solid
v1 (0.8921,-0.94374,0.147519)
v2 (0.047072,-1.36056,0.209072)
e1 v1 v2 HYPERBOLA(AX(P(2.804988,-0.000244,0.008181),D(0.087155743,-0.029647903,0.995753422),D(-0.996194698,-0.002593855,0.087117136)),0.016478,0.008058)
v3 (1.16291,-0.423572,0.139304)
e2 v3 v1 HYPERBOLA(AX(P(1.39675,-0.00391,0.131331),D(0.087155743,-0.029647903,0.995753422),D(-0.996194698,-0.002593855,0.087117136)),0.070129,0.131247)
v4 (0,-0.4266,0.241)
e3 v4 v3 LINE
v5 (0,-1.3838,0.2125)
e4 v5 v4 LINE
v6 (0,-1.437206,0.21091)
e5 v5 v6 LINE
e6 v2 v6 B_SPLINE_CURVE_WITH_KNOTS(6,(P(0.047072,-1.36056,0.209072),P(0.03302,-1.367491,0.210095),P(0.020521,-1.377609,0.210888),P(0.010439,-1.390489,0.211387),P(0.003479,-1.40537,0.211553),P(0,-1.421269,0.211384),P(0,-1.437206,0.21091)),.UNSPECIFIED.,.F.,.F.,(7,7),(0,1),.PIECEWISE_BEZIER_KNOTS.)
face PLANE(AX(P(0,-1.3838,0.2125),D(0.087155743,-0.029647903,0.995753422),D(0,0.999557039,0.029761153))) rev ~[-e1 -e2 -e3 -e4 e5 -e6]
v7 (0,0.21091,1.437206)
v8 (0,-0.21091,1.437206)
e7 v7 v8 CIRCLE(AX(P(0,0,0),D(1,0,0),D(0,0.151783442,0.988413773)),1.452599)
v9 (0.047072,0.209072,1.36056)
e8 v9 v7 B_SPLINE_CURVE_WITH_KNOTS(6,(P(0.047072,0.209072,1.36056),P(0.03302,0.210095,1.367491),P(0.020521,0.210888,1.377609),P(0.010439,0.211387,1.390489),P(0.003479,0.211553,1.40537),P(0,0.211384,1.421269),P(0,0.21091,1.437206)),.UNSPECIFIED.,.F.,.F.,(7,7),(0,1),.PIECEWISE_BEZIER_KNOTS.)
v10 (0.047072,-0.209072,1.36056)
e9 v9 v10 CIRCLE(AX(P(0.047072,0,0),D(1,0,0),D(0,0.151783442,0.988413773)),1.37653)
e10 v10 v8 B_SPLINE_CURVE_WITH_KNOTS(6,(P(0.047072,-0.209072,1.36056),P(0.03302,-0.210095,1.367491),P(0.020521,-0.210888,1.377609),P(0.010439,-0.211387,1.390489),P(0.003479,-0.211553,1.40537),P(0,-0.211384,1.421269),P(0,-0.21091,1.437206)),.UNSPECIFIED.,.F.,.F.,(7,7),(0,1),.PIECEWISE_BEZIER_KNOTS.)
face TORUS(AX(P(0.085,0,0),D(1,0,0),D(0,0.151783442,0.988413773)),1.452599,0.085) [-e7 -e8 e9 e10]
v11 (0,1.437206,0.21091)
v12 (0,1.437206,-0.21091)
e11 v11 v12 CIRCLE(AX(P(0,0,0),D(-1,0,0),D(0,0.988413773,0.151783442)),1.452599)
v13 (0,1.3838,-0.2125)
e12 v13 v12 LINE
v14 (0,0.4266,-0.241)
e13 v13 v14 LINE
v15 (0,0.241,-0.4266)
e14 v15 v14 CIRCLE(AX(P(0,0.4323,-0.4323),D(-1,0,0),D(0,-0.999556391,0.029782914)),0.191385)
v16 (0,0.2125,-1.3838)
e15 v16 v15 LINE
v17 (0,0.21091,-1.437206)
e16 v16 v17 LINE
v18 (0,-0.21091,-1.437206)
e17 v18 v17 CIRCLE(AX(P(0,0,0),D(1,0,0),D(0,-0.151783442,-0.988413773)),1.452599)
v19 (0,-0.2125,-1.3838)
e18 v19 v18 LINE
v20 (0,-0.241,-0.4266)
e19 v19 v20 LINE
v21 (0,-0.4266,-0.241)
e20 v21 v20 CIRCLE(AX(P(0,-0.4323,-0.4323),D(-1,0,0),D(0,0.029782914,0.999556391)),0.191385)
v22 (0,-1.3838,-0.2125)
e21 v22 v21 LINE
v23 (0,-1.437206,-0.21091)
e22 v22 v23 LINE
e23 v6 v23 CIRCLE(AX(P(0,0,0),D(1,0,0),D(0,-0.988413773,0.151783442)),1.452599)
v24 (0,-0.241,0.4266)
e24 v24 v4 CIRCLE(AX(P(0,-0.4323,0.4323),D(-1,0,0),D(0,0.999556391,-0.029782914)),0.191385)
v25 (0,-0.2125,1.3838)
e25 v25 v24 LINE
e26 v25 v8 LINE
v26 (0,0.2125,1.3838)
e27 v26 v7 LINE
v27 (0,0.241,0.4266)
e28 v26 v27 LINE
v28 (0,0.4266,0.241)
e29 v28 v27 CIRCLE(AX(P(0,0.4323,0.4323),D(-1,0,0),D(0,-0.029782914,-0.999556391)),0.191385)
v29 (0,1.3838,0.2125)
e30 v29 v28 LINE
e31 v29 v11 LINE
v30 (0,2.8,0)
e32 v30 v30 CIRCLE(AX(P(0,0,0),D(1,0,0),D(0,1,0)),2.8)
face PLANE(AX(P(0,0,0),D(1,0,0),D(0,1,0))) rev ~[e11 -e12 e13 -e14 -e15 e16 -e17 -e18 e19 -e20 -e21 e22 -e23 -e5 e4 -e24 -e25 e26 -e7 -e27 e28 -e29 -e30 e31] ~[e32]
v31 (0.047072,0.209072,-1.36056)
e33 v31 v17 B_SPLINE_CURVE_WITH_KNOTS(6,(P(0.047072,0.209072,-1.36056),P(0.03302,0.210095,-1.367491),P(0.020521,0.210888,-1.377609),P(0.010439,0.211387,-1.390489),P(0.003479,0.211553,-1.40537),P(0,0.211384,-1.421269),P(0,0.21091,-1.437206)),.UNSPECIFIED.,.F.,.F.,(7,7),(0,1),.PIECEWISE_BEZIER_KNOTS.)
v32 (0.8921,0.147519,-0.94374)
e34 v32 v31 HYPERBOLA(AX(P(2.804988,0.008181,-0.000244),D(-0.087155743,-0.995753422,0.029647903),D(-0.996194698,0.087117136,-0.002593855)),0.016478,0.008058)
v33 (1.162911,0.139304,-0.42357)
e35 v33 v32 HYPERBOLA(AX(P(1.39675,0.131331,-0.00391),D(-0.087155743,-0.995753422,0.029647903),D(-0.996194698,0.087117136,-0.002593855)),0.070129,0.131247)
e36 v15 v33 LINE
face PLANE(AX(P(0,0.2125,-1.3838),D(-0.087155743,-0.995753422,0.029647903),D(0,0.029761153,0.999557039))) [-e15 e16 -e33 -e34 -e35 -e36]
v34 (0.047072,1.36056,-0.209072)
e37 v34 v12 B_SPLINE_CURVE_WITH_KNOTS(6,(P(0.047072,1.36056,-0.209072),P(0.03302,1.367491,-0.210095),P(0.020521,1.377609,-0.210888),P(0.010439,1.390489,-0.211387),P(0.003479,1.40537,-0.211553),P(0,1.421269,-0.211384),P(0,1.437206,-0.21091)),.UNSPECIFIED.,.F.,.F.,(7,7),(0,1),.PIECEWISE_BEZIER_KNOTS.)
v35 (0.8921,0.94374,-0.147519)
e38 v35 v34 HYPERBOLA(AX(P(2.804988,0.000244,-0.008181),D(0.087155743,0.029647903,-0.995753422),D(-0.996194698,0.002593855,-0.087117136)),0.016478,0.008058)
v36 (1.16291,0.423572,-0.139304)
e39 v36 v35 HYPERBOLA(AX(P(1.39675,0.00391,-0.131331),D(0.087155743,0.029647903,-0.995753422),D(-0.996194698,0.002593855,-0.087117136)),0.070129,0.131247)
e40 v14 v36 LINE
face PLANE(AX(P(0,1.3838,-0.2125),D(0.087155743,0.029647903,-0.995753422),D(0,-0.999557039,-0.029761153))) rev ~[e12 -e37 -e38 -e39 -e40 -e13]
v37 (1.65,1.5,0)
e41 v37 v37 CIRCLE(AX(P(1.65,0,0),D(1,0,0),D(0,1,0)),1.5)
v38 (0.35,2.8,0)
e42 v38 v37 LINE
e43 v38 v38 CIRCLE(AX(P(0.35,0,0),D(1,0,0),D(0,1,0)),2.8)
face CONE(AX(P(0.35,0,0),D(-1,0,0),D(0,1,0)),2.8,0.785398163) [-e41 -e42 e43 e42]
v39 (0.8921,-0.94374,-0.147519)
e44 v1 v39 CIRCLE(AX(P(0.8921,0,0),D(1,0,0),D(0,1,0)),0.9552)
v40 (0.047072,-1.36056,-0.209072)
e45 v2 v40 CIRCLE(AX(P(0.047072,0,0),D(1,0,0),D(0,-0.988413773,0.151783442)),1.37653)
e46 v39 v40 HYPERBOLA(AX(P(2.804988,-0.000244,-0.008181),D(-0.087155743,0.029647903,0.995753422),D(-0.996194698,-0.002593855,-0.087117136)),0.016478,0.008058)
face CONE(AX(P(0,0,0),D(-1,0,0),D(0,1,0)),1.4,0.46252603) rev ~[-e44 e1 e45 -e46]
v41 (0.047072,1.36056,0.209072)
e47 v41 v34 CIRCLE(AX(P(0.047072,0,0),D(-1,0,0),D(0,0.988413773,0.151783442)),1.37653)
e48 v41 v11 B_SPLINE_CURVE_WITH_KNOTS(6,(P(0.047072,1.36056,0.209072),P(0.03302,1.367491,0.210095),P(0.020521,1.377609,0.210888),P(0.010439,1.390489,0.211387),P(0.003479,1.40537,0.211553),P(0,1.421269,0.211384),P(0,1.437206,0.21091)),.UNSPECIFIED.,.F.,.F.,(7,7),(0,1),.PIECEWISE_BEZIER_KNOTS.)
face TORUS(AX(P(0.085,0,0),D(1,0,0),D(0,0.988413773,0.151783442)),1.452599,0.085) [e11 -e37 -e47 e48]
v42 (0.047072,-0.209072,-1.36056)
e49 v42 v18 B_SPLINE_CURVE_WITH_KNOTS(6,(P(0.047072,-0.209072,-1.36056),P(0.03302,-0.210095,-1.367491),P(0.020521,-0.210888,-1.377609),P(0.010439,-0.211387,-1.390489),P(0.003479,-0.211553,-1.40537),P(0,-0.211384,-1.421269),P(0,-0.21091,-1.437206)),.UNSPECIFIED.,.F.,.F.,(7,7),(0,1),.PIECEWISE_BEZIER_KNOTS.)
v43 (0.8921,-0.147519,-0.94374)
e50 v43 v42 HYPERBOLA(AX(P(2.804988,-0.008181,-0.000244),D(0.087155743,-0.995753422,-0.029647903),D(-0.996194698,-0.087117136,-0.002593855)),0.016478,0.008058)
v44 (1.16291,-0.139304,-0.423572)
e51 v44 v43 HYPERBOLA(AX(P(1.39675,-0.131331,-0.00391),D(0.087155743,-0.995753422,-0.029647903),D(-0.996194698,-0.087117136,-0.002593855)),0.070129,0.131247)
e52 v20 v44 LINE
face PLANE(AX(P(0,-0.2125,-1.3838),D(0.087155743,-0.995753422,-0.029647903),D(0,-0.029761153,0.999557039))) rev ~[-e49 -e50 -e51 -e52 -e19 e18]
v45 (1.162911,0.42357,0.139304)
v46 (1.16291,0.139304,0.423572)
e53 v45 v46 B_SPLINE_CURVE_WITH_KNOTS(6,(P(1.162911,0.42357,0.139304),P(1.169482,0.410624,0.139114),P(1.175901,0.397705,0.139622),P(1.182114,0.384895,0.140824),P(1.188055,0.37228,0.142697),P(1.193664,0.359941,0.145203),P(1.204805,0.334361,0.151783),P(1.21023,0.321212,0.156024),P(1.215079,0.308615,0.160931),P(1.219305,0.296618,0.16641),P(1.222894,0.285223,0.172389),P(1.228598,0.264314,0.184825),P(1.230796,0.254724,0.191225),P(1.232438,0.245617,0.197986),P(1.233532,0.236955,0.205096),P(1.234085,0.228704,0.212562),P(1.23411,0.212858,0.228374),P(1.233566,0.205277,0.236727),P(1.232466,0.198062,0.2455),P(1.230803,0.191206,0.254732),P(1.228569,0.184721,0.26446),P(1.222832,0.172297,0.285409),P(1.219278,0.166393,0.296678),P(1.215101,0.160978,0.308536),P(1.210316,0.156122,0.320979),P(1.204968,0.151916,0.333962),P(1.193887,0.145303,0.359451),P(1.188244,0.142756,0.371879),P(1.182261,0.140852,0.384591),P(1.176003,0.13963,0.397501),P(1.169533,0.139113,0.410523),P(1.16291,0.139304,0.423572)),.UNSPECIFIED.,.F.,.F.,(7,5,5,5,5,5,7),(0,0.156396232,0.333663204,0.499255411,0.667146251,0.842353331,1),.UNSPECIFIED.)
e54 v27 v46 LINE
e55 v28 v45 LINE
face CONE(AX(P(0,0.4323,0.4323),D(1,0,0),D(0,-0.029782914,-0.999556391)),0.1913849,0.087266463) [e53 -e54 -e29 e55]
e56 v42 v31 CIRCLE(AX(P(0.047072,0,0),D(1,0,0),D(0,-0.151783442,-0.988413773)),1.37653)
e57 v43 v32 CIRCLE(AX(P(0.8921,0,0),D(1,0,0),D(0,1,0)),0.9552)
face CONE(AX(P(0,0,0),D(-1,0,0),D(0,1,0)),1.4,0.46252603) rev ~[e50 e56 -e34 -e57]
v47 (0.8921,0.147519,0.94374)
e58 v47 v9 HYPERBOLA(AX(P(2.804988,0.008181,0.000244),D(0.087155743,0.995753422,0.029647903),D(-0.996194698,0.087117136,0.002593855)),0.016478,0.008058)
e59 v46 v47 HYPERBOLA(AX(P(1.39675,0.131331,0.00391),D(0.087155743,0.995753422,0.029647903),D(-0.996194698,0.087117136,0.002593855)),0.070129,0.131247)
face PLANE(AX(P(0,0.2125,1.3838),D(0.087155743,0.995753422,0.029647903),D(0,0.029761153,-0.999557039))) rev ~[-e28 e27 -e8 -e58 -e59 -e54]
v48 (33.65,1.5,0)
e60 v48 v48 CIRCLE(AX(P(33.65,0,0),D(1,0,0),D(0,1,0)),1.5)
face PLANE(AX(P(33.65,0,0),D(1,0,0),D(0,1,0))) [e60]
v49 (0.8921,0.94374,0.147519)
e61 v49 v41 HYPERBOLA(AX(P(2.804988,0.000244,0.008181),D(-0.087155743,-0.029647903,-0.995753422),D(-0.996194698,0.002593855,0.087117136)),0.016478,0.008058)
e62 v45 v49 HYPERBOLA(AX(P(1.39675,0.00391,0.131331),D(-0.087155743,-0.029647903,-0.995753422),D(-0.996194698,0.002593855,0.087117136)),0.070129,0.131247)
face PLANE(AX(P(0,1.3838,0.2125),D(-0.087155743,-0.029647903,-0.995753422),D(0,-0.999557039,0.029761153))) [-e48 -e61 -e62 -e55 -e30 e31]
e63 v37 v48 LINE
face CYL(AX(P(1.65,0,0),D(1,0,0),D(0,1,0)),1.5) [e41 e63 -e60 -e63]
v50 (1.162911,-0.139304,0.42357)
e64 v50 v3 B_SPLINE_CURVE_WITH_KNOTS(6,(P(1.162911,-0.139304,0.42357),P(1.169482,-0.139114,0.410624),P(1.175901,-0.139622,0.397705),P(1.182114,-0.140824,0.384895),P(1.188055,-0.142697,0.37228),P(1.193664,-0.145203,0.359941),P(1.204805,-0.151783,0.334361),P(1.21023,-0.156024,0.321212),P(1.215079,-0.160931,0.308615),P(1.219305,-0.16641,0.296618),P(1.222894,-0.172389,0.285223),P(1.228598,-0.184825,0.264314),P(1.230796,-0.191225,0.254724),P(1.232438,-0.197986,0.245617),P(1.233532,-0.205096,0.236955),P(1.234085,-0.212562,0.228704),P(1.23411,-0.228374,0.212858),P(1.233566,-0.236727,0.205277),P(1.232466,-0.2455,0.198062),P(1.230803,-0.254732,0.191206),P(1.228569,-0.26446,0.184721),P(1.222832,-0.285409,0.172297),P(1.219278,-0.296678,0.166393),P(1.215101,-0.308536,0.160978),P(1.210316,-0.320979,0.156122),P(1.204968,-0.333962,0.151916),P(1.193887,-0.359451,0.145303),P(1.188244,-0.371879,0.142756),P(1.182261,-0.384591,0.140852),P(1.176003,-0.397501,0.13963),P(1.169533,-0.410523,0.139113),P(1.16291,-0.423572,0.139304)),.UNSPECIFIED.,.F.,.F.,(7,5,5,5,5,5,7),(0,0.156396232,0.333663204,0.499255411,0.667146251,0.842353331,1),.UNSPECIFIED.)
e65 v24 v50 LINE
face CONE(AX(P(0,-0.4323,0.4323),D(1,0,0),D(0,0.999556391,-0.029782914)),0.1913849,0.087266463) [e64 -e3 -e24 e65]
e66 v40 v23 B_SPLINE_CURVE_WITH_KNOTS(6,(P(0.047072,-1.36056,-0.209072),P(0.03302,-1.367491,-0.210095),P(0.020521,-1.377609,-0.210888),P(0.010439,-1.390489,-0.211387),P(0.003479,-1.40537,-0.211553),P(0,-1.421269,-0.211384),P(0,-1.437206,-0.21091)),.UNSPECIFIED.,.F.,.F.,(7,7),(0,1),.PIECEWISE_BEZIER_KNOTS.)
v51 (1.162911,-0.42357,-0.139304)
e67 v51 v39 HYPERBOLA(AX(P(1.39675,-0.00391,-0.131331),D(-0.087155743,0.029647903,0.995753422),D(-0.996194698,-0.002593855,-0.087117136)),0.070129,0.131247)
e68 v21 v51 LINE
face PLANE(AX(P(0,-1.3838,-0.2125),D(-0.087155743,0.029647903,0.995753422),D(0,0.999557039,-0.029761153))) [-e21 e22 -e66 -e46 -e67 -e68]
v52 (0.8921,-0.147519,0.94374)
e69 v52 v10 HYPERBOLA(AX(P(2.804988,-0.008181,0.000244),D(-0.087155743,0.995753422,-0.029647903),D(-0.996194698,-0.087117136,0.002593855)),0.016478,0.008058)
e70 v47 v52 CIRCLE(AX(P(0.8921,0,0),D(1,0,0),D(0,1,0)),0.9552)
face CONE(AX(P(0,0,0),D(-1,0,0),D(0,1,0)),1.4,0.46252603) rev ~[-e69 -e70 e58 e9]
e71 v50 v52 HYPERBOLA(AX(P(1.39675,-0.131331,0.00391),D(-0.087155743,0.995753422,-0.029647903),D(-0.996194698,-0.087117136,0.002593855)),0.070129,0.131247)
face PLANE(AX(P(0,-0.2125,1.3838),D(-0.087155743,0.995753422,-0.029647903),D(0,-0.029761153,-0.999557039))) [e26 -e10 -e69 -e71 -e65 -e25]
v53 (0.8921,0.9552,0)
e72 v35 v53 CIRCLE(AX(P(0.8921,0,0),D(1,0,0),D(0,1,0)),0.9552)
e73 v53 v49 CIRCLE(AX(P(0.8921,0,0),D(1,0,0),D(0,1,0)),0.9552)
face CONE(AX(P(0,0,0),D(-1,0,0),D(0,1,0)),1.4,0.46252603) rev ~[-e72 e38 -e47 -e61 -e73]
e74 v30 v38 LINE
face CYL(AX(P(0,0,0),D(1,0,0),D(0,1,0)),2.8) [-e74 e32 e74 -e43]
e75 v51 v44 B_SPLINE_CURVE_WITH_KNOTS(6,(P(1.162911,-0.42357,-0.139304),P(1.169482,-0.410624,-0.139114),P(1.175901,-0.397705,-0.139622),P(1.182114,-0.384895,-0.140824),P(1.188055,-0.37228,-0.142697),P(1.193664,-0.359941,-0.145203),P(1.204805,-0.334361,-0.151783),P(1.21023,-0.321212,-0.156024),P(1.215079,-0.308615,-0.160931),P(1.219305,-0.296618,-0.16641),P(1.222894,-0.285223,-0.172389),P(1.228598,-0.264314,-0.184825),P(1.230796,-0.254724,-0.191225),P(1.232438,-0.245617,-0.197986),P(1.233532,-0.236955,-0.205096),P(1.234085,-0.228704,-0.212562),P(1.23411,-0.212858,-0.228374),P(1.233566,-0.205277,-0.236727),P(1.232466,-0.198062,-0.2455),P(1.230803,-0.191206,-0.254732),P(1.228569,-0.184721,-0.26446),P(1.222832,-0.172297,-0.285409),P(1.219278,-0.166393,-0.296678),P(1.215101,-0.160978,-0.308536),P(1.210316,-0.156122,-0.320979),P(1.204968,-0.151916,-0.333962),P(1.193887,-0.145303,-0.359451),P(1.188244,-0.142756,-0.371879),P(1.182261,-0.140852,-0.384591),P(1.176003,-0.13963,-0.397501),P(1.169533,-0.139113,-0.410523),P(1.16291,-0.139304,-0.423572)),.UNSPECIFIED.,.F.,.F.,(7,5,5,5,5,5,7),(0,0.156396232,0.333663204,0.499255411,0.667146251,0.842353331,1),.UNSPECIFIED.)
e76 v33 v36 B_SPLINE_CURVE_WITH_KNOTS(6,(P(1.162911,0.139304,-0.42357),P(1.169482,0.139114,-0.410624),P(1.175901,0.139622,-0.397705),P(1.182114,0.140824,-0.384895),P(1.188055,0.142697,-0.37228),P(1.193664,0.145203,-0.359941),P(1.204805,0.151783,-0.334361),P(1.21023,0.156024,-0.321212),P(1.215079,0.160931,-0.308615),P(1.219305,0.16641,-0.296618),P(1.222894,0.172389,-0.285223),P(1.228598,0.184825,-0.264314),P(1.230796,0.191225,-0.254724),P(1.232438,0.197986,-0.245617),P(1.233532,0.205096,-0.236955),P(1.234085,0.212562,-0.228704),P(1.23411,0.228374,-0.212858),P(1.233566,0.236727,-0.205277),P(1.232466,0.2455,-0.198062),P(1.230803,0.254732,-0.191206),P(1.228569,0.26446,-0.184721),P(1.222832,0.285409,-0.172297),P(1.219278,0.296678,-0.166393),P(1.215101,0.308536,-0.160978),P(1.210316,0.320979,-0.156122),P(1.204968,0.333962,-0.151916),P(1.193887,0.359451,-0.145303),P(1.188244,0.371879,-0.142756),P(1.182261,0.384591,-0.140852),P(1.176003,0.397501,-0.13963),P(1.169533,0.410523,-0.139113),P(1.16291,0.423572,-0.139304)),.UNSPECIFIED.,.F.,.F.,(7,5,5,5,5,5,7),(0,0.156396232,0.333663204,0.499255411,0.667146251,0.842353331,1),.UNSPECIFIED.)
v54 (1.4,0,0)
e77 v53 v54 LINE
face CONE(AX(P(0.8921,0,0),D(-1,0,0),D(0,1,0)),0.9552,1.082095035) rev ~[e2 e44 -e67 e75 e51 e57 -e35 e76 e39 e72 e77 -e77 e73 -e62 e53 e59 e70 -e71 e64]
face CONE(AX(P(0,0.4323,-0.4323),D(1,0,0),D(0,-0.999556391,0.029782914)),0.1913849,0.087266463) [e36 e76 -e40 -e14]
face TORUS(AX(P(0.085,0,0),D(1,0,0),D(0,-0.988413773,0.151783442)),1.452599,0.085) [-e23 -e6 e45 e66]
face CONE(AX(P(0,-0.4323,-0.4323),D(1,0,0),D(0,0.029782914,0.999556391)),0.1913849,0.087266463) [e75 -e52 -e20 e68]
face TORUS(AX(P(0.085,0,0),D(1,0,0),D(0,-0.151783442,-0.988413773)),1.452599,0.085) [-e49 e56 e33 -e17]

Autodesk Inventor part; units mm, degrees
ref_plane "YZ Plane" through (0, 0, 0) normal (1, 0, 0) x (0, 1, 0)
ref_plane "XZ Plane" through (0, 0, 0) normal (0, 1, 0) x (-1, 0, 0)
sketch "Эскиз1" plane through (0, 0, 0) normal (0, 0, 1) x (1, 0, 0)
  line L0 (1.4, 0) -> (30, 0)
  line L1 (11, 1.5) -> (10.6933, 1.5)
  line L2 (0, 2.8) -> (0, 1.4)
  line L3 (0, 1.4) -> (0.8921, 0.9552)
  line L4 (0.8921, 0.9552) -> (1.4, 0)
  line L5 (-6.73, 0) -> (40.38, 0) projected
  line L6 (0, -0.56) -> (0, 3.36) projected
  line L7 (0, 2.8) -> (0.35, 2.8)
  line L8 (0.35, 2.8) -> (1.65, 1.5)
  line L9 (11, 1.5) -> (1.65, 1.5) construction
  line L10 (1.65, 1.5) -> (33.65, 1.5)
  line L11 (33.65, 1.5) -> (33.65, 0)
  line L12 (33.65, 0) -> (30, 0)
  dimension "d4" = 2.8
  dimension "d5" = 26.5
  dimension "d6" = 62
  dimension "d7" = 1.4
  dimension "d8" = 0.3067
  dimension "d12" = 5.6
  dimension "d13" = 45
  dimension "d24" = 1.65
  dimension "d96" = 32
revolve "Базовый элемент" add sketch "Эскиз1" angle 360 about axis through (1.4, 0, 0) along (1, 0, 0) contours L4 L3 L2 L7 L8 L10 L1 L11 L5 L0
sketch "Эскиз2" plane through (0, 0, 0) normal (-1, 0, 0) x (0, 0, 1)
  line L0 (0, 1.4) -> (0, 0) construction
  line L1 (0, 0) -> (1.4, 0) construction
  arc A0 (0.42, 0) -> (0, 0.42) centre (0, 0) ccw construction
  arc A1 (0.49, 0) -> (0, 0.49) centre (0, 0) ccw construction
  arc A2 (1.3838, 0.2125) -> (0.2125, 1.3838) centre (0, 0) ccw
  line L2 (0, 0) -> (0.9899, 0.9899) construction
  line L3 (0.2125, 1.3838) -> (0.241, 0.4266)
  line L4 (1.3838, 0.2125) -> (0.4266, 0.241)
  arc A3 (0.2125, 1.3838) -> (0, 1.4) centre (0, 0) ccw
  arc A4 (1.4, 0) -> (1.3838, 0.2125) centre (0, 0) ccw
  line L5 (0, -3.92) -> (0, 3.92) projected
  line L6 (-3.92, 0) -> (3.92, 0) projected
  arc A5 (0.2125, -1.3838) -> (1.3838, -0.2125) centre (0, 0) ccw
  line L7 (0.2125, -1.3838) -> (0.241, -0.4266)
  line L8 (1.3838, -0.2125) -> (0.4266, -0.241)
  arc A6 (0, -1.4) -> (0.2125, -1.3838) centre (0, 0) ccw
  arc A7 (1.3838, -0.2125) -> (1.4, 0) centre (0, 0) ccw
  arc A8 (-0.2125, 1.3838) -> (-1.3838, 0.2125) centre (0, 0) ccw
  line L9 (-0.2125, 1.3838) -> (-0.241, 0.4266)
  line L10 (-1.3838, 0.2125) -> (-0.4266, 0.241)
  arc A9 (0, 1.4) -> (-0.2125, 1.3838) centre (0, 0) ccw
  arc A10 (-1.3838, 0.2125) -> (-1.4, 0) centre (0, 0) ccw
  arc A11 (-0.2125, -1.3838) -> (0, -1.4) centre (0, 0) ccw
  arc A12 (-1.3838, -0.2125) -> (-0.2125, -1.3838) centre (0, 0) ccw
  arc A13 (-1.4, 0) -> (-1.3838, -0.2125) centre (0, 0) ccw
  line L11 (-1.3838, -0.2125) -> (-0.4266, -0.241)
  line L12 (-0.2125, -1.3838) -> (-0.241, -0.4266)
  arc A14 (0.241, 0.4266) -> (0.4266, 0.241) centre (0.4323, 0.4323) ccw
  arc A15 (0.4266, -0.241) -> (0.241, -0.4266) centre (0.4323, -0.4323) ccw
  arc A16 (-0.4266, 0.241) -> (-0.241, 0.4266) centre (-0.4323, 0.4323) ccw
  arc A17 (-0.241, -0.4266) -> (-0.4266, -0.241) centre (-0.4323, -0.4323) ccw
  point P0 (0.9899, -0.9899)
  point P1 (-0.9899, 0.9899)
  point P2 (-0.9899, -0.9899)
  dimension "d17" = 0.84
  dimension "d18" = 0.98
  dimension "d19" = 2.8
  dimension "d20" = 45
  dimension "d21" = 0.2125
extrude "Паз" add sketch "Эскиз2" against normal up to next draft 5 contours L4 A14 L3 A2 | A5 L7 A15 L8 | L9 A16 L10 A8 | A12 L11 A17 L12
fillet "Сопряжение1" radius 0.085 4 edges at (0, 1.4, 0) (0, 0, -1.4) (0, -1.4, 0) (0, 0, 1.4)
thread "Резьба" size "M3x0.5" class "6g" standard "ISO Metric profile" length 32
ref_plane "Work Plane2" through (3.35, 0, 0) normal (0, 0, -1) x (1, 0, 0)
equation "\"d17\" = 0.3 * SDM"
equation "\"d18\" = 0.35 * SDM"
equation "\"d19\" = SDM"
equation "\"d21\" = 0.5 * SBR"
equation "\"d4\" = SDM"
equation "\"d7\" = INTI"
equation "\"d8\" = GAL"
equation "\"d12\" = KOD"
equation "\"d13\" = 0.5 * SEWI"
equation "\"d24\" = KOH"
equation "\"d23\" = 0.2 * SBR"
equation "\"d10\" = d96"
equation "\"GEL\" = 19"
equation "\"GAL\" = 0.61345 * PTC"
equation "\"SPD\" = NND - 1.2269 * PTC"
equation "\"KOD\" = 5.6"
equation "\"KOH\" = 1.65"
equation "\"SBR\" = 0.425"
equation "\"INTI\" = 1.4"
equation "\"SDM\" = 2.8"
equation "\"GD\" = NND"
equation "\"BDM\" = NND"
equation "\"SEWI\" = 90deg"
equation "\"d9\" = SDM"
equation "\"GUL\" = 0.61345 * PTC"
equation "\"TOA\" = 30deg"
equation "\"EPV\" = 3.15"
equation "\"THREADDIA\" = 3"
equation "\"FAWI\" = 45deg"
equation "\"RR\" = 0.1 * NND"
equation "\"PTC\" = 0.5"
equation "\"NND\" = 3"
equation "\"GD1\" = THREADDIA - 1.2269 * PTC"
properties part number "Винт 2.M3-6gx30 ГОСТ 17475-80" material "Сталь, мягкая"
